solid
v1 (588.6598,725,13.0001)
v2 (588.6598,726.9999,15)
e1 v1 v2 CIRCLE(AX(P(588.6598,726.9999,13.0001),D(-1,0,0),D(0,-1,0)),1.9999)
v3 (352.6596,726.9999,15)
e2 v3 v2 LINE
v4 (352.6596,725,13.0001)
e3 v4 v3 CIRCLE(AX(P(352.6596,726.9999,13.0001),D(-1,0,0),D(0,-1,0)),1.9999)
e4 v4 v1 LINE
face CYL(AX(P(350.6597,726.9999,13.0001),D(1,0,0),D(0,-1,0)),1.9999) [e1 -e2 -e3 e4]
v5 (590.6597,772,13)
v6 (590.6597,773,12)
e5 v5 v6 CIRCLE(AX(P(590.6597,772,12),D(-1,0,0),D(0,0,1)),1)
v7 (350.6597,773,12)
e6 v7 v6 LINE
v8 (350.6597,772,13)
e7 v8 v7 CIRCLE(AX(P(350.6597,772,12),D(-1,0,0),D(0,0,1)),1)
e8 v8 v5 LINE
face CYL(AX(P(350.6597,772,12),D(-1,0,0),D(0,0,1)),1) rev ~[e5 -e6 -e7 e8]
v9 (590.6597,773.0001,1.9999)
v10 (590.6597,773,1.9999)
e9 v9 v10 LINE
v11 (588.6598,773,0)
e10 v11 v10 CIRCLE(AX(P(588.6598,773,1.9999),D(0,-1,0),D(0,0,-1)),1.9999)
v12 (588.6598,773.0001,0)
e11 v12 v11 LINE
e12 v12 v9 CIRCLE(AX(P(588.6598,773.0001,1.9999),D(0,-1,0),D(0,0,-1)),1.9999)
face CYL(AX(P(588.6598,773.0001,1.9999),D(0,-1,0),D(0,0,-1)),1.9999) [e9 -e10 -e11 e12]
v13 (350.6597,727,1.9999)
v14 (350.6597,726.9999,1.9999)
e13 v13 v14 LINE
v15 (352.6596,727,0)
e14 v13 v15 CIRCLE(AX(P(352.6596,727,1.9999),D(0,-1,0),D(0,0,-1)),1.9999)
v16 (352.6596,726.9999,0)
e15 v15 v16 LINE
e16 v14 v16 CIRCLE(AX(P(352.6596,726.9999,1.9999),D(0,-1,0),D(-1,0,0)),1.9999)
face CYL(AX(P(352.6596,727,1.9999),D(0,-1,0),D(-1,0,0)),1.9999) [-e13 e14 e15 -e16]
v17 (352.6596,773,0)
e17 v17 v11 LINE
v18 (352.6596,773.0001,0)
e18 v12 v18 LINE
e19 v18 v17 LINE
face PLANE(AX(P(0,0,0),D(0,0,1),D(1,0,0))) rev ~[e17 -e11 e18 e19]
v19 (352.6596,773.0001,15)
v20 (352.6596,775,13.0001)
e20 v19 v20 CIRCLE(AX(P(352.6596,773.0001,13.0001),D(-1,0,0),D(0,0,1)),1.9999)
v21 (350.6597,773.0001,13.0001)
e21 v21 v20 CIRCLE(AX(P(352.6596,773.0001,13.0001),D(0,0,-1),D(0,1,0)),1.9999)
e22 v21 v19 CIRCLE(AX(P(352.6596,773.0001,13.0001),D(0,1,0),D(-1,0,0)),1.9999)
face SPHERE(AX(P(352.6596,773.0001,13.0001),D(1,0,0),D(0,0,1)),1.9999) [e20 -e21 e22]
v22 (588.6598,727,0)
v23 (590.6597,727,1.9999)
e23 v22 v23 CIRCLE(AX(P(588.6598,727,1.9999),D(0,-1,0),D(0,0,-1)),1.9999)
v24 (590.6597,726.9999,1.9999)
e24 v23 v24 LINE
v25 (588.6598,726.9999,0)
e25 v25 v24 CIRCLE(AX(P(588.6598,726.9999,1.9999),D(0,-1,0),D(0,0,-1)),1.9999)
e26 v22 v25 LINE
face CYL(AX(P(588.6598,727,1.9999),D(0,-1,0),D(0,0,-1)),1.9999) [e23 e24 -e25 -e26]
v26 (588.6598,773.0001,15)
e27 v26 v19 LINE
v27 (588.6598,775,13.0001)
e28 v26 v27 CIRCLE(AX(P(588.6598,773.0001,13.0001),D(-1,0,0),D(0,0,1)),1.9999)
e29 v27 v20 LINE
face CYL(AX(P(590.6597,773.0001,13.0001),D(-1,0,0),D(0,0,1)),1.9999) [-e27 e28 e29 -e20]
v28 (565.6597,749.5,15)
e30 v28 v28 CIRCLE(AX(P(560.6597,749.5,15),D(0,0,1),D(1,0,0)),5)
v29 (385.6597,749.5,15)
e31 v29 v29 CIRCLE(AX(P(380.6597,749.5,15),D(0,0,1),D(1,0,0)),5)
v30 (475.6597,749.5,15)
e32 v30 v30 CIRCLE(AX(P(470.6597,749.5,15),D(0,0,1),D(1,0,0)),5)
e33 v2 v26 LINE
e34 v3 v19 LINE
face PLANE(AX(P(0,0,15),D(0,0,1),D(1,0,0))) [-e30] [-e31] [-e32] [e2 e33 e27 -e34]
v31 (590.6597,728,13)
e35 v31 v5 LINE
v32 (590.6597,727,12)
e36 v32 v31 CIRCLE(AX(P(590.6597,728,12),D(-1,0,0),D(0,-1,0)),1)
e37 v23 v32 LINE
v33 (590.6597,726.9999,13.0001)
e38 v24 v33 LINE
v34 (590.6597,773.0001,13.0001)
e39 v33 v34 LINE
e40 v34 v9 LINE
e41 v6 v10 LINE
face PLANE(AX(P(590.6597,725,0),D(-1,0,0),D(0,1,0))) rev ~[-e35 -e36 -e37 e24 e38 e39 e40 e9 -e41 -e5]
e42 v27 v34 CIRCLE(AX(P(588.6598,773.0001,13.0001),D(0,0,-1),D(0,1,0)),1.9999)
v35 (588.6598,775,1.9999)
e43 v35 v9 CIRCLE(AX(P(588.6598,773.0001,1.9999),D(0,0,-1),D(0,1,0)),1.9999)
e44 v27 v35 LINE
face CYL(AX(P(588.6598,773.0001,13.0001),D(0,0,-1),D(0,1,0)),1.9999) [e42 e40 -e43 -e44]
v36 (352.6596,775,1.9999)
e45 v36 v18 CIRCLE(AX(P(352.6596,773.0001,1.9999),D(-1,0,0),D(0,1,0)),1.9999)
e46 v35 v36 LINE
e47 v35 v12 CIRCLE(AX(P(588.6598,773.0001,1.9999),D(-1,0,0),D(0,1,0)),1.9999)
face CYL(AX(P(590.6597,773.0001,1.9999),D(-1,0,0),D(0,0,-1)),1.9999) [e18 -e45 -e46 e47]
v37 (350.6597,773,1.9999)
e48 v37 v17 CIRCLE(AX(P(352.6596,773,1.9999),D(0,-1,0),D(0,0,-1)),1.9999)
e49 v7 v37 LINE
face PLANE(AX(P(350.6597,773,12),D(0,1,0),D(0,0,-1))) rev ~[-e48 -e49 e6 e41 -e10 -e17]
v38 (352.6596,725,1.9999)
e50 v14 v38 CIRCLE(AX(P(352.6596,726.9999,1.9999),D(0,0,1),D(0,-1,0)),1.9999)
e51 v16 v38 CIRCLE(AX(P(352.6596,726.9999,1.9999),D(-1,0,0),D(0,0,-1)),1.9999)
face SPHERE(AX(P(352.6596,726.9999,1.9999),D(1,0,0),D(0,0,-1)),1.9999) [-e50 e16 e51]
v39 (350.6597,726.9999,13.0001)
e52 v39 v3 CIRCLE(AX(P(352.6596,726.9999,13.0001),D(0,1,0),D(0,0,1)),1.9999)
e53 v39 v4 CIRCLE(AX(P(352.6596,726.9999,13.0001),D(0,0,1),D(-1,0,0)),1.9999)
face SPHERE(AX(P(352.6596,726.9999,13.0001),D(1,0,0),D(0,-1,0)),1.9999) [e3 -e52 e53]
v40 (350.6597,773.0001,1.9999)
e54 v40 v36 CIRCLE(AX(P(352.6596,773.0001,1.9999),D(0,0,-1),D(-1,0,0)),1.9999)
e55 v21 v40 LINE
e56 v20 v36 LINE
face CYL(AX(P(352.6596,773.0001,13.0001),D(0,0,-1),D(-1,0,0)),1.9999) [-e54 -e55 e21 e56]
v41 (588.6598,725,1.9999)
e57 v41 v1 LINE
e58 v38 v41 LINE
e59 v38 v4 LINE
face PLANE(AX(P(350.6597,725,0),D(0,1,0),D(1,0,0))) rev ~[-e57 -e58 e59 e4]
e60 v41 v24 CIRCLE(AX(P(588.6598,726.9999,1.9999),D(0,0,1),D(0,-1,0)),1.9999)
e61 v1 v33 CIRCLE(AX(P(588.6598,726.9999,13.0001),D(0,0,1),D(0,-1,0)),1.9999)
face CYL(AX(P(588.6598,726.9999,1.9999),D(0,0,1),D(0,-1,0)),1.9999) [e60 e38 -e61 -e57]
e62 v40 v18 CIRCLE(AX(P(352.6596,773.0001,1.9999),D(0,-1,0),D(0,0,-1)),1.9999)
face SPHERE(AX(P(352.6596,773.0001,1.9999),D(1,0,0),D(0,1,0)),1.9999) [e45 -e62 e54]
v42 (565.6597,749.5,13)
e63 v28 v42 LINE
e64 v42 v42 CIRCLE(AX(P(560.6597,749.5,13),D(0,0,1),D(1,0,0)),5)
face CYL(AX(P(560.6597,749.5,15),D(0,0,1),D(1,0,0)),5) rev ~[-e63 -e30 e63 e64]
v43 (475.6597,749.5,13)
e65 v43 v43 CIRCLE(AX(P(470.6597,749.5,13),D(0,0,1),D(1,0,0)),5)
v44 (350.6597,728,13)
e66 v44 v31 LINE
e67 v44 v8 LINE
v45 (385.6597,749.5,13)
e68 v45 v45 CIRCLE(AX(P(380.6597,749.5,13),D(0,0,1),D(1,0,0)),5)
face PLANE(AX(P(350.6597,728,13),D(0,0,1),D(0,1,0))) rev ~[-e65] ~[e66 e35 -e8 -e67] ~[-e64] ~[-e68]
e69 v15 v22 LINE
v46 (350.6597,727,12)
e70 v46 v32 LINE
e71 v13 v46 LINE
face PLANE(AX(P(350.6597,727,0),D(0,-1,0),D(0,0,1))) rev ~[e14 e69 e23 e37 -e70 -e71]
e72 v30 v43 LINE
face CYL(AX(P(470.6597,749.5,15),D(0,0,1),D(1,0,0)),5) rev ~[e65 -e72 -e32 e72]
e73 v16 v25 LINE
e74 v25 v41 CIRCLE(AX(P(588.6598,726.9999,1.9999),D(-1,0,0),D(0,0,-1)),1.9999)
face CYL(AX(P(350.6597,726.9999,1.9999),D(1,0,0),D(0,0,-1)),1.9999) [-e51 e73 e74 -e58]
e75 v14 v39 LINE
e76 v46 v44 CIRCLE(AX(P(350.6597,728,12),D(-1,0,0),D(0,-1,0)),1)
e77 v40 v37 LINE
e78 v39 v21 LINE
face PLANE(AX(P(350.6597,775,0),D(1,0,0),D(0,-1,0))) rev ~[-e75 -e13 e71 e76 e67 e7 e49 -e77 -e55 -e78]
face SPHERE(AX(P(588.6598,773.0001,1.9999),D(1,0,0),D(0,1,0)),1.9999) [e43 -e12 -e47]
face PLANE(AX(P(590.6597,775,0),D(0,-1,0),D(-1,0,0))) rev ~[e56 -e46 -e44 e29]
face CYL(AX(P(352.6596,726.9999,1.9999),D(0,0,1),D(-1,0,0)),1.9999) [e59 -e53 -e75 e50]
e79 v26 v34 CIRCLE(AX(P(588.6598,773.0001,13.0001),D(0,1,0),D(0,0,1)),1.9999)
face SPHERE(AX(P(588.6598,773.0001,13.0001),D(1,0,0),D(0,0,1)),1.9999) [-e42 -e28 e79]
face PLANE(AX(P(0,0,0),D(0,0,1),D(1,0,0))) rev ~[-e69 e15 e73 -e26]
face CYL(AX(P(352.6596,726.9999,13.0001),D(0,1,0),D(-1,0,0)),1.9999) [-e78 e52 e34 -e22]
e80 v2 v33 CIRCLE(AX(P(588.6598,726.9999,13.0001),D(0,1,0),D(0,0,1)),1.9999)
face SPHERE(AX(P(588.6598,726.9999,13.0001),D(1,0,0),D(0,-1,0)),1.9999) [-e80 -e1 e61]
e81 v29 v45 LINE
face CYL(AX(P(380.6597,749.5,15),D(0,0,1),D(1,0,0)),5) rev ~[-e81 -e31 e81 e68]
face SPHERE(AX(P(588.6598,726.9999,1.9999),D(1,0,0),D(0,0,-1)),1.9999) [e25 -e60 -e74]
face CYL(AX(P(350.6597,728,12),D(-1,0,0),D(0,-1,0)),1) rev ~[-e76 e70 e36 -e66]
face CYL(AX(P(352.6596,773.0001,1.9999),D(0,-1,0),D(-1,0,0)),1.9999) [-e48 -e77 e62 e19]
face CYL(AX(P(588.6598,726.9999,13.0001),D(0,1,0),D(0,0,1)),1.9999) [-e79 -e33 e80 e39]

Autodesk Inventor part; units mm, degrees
ref_plane "YZ Plane" through (0, 0, 0) normal (1, 0, 0) x (0, 1, 0)
ref_plane "XZ Plane" through (0, 0, 0) normal (0, 1, 0) x (-1, 0, 0)
ref_plane "Work Plane1" through (0, 0, 0) normal (0, 0, 1) x (1, 0, 0)
sketch "Sketch1" plane through (0, 0, 0) normal (0, 0, 1) x (1, 0, 0)
  line L0 (350.6597, 725) -> (590.6597, 725)
  line L1 (590.6597, 725) -> (590.6597, 775)
  line L2 (590.6597, 775) -> (350.6597, 775)
  line L3 (350.6597, 775) -> (350.6597, 725)
  line L4 (164.0316, 10) -> (164.0316, 1490) projected
  line L5 (777.2877, 10) -> (164.0316, 10) projected
  line L6 (470.6597, 10) -> (470.6597, 1506) construction
  line L7 (164.0316, 750) -> (680, 750) construction
  point P0 (0, 0)
  point P1 (470.6597, 725)
  point P2 (350.6597, 750)
  dimension "d0" = 240
  dimension "d1" = 50
extrude "Extrusion1" add sketch "Sketch1" along normal blind 15
sketch "Sketch2" plane through (350.6597, 725, 0) normal (-1, 0, 0) x (0, 0, 1)
  line L0 (15, 0) -> (0, 0) projected
  line L1 (0, 0) -> (0, 50) projected
  line L2 (0, 50) -> (15, 50) projected
  line L3 (15, 50) -> (15, 0) projected
  line L4 (12, 48) -> (0, 48)
  line L5 (0, 2) -> (12, 2)
  line L6 (13, 3) -> (13, 47)
  arc A0 (13, 47) -> (12, 48) centre (12, 47) ccw
  arc A1 (12, 2) -> (13, 3) centre (12, 3) ccw
  point P0 (0, -725)
  dimension "d5" = 2
extrude "Extrusion2" cut sketch "Sketch2" against normal through all contours L1 L4 A0 L6 A1 L5
fillet "Fillet1" radius 2 4 edges at (470.6597, 775, 15) (470.6597, 775, 0) (470.6597, 725, 0) (470.6597, 725, 15)
sketch "Sketch3" plane through (0, 0, 15) normal (0, 0, 1) x (1, 0, 0)
  line L0 (350.6597, 727) -> (590.6597, 727) construction
  line L1 (590.6597, 773) -> (590.6597, 727) construction
  line L2 (590.6597, 773) -> (350.6597, 773) construction
  line L3 (350.6597, 727) -> (350.6597, 773) construction
  line L4 (350.6597, 772) -> (590.6597, 772) projected
  line L5 (470.6597, 772) -> (470.6597, 727) construction
  circle A0 centre (470.6597, 749.5) radius 5
  point P0 (0, 0)
  dimension "d10" = 10
extrude "Extrusion3" cut sketch "Sketch3" against normal up to next
pattern_linear "Rectangular Pattern1" count 3 spacing 90 along (1, 0, 0) of "Extrusion3" first direction both ways yes
fillet "Fillet2" radius 2 14 edges at (350.6597, 725.5858, 14.4142) (350.6597, 725, 7.5) (350.6597, 725.5858, 0.5858) (350.6597, 774.4142, 14.4142) (350.6597, 775, 7.5) (350.6597, 774.4142, 0.5858) (350.6597, 750, 15) (590.6597, 774.4142, 14.4142) (590.6597, 775, 7.5) (590.6597, 774.4142, 0.5858) (590.6597, 725.5858, 14.4142) (590.6597, 725, 7.5) (590.6597, 725.5858, 0.5858) (590.6597, 750, 15)
properties part number "support3" material "Stainless Steel"
